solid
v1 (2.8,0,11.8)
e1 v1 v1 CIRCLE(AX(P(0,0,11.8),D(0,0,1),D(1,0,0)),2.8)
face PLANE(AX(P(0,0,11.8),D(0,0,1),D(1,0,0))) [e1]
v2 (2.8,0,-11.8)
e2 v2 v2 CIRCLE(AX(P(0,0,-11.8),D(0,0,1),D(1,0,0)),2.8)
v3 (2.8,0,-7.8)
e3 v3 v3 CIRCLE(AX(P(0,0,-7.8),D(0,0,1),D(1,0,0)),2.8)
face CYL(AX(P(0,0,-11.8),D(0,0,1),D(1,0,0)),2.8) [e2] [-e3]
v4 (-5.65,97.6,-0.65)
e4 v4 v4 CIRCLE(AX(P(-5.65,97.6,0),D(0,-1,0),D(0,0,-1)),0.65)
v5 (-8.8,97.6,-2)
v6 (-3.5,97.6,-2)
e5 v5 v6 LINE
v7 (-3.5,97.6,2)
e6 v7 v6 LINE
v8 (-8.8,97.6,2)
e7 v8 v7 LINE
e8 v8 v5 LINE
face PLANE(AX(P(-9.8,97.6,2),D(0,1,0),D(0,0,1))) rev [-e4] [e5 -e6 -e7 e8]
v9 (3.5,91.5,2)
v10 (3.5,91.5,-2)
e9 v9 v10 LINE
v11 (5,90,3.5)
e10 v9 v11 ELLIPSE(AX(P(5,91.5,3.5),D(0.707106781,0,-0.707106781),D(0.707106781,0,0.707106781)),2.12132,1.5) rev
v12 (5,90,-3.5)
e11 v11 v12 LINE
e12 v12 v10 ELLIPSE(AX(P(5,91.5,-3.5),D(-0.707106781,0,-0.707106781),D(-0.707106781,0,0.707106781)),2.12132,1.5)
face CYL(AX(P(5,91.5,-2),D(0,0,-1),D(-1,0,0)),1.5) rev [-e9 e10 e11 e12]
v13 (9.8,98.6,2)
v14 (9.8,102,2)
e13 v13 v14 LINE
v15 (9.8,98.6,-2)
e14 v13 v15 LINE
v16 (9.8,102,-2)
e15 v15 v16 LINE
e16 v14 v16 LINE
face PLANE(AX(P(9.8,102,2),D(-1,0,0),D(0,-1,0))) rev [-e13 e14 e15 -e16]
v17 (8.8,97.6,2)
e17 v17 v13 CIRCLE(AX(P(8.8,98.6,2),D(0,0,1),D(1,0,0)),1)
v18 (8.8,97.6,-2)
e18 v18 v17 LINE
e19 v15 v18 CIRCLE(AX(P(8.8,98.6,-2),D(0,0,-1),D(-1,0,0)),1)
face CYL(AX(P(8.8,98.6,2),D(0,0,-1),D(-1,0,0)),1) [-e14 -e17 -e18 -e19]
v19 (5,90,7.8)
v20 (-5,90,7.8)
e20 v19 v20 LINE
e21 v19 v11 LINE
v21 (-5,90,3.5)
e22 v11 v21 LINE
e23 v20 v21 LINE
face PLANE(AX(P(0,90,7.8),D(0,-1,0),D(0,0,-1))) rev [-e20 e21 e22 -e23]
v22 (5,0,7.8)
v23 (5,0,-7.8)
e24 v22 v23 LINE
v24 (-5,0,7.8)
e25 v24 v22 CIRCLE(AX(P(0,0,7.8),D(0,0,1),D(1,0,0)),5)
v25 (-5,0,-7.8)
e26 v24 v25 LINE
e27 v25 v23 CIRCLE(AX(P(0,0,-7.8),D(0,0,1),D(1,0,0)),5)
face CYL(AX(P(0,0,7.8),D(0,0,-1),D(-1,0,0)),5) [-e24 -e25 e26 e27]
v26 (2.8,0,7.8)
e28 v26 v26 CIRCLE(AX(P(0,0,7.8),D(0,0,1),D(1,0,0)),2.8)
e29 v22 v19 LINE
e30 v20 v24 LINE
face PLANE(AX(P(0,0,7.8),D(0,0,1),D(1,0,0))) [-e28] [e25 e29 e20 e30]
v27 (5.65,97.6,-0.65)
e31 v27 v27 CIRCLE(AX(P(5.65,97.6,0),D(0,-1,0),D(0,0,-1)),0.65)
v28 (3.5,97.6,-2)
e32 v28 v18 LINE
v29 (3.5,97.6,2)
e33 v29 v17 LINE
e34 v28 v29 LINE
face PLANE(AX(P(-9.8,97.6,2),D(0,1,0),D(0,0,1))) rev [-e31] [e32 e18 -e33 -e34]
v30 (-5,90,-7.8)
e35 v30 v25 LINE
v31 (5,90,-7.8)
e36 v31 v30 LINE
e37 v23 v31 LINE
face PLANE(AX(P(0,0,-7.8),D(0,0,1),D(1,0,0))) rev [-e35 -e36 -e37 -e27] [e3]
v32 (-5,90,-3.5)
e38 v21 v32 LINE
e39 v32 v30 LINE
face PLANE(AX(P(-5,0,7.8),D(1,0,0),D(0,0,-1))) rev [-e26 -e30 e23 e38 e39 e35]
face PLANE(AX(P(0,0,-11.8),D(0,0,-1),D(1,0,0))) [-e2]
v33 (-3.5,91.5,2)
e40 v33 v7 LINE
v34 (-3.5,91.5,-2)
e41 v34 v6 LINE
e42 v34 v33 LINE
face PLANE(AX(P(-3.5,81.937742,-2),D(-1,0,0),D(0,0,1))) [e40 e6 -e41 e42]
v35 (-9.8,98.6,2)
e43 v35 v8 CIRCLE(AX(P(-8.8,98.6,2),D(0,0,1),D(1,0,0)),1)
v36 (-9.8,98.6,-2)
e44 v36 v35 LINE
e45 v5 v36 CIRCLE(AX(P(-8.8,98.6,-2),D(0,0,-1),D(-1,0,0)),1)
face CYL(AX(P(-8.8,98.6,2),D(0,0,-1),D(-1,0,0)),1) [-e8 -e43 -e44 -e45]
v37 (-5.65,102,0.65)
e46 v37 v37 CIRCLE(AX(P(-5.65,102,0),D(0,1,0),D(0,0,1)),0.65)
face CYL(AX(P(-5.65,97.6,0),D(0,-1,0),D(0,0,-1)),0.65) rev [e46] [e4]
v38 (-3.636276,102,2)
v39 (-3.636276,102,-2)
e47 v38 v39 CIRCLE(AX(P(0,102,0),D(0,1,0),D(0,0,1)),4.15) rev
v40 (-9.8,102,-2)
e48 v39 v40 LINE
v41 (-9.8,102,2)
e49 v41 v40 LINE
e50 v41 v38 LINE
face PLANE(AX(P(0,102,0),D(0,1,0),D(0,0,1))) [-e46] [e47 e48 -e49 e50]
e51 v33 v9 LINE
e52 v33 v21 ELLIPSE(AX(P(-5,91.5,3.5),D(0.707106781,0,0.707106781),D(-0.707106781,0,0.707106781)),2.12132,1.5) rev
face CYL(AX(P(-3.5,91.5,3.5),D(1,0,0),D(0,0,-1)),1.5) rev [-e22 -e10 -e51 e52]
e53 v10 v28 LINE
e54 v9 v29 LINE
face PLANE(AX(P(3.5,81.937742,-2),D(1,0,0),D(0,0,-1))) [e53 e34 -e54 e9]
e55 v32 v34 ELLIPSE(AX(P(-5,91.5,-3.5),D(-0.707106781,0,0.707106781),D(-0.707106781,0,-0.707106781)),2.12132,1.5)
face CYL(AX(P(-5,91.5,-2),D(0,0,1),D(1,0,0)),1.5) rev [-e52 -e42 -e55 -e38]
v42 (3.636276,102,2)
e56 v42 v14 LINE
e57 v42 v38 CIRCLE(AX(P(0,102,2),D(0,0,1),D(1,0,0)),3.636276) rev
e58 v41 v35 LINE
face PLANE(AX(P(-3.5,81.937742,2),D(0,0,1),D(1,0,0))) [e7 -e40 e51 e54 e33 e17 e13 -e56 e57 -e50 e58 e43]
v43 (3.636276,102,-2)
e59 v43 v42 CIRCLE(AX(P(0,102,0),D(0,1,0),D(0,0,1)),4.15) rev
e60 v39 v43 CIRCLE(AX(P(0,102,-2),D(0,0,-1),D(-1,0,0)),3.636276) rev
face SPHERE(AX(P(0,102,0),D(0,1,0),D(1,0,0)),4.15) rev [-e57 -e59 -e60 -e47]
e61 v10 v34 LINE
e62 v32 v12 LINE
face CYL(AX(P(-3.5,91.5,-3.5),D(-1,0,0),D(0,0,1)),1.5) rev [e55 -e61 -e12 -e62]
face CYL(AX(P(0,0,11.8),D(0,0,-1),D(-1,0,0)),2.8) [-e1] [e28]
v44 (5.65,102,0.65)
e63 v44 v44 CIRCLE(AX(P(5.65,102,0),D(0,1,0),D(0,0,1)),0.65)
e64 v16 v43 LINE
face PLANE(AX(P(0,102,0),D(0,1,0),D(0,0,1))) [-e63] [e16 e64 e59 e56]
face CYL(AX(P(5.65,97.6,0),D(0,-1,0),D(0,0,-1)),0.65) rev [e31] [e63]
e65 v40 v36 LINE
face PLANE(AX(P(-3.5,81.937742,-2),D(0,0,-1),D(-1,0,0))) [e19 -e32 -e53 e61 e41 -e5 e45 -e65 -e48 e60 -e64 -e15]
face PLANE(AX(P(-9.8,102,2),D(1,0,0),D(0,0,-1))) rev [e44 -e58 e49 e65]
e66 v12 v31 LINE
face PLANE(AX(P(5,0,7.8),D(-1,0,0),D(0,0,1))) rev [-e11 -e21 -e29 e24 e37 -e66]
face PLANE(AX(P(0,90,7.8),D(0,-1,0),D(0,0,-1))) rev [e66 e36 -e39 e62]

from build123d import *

# Parameters (mm, degrees)
EXTRUDE_1_DEPTH = 7.8
SKETCH_4_R      = 2.8
EXTRUDE_3_DEPTH = 4
SKETCH_5_W      = 7
SKETCH_5_H      = 4
EXTRUDE_4_DEPTH = 12
SKETCH_7_W      = 19.6
SKETCH_7_H      = 4.4
EXTRUDE_5_DEPTH = 2
FILLET_2_R      = 1
HOLE_WIZARD_1_D = 1.3
FILLET_3_R      = 1.5


with BuildPart() as part:
    # 草图1 → 凸台-拉伸1 (new, symmetric)
    with BuildSketch(Plane.XY):
        with BuildLine():
            Line((5, 0), (5, 90))
            Line((5, 90), (-5, 90))
            Line((-5, 90), (-5, 0))
            ThreePointArc((-5, 0), (0, -5), (5, 0))
        make_face()
    extrude(amount=EXTRUDE_1_DEPTH, both=True)

    # 草图4 → 凸台-拉伸3 (add)
    with BuildSketch(Plane.XY.offset(7.8)):
        Circle(SKETCH_4_R)
    extrude_3 = extrude(amount=EXTRUDE_3_DEPTH)

    # 草图5 → 凸台-拉伸4 (add)
    with BuildSketch(Plane(origin=(0, 102, 0), x_dir=(1, 0, 0), z_dir=(0, 1, 0))):
        Rectangle(SKETCH_5_W, SKETCH_5_H)
    extrude(amount=-EXTRUDE_4_DEPTH)

    # 草图7 → 凸台-拉伸5 (add, symmetric)
    with BuildSketch(Plane.XY):
        with Locations((0, 99.8)):
            Rectangle(SKETCH_7_W, SKETCH_7_H)
    extrude(amount=EXTRUDE_5_DEPTH, both=True)

    # 草图10 → 切除-旋转1 (revolve, cut)
    with BuildSketch(Plane.XY):
        with BuildLine():
            ThreePointArc((4.15, 102), (2.934493142, 104.934493142), (0, 106.15))
            Line((0, 106.15), (0, 102))
            Line((0, 102), (0, 97.85))
            ThreePointArc((0, 97.85), (2.934493142, 99.065506858), (4.15, 102))
        make_face()
    revolve(axis=Axis((0, 106.15, 0), (0, -1, 0)), mode=Mode.SUBTRACT)

    # 镜向2: 凸台-拉伸3 across plane
    add(extrude_3.mirror(Plane.XY))

    # 圆角2
    fillet_2_edges = [part.edges().sort_by_distance(p)[0] for p in [
        (-9.8, 97.6, 0),
        (9.8, 97.6, 0),
    ]]
    fillet(fillet_2_edges, radius=FILLET_2_R)

    # 孔1 (through all)
    with Locations(Plane(origin=(0, 97.6, 0), x_dir=(-1, 0, 0), z_dir=(0, -1, 0))):
        with Locations((5.65, 0), (-5.65, 0)):
            Hole(HOLE_WIZARD_1_D / 2)

    # 圆角3
    fillet_3_edges = [part.edges().sort_by_distance(p)[0] for p in [
        (0, 90, -2),
        (-3.5, 90, 0),
        (0, 90, 2),
        (3.5, 90, 0),
    ]]
    fillet(fillet_3_edges, radius=FILLET_3_R - 0.0001)  # a hair under: the kernel refuses the full size


solid = part.part
